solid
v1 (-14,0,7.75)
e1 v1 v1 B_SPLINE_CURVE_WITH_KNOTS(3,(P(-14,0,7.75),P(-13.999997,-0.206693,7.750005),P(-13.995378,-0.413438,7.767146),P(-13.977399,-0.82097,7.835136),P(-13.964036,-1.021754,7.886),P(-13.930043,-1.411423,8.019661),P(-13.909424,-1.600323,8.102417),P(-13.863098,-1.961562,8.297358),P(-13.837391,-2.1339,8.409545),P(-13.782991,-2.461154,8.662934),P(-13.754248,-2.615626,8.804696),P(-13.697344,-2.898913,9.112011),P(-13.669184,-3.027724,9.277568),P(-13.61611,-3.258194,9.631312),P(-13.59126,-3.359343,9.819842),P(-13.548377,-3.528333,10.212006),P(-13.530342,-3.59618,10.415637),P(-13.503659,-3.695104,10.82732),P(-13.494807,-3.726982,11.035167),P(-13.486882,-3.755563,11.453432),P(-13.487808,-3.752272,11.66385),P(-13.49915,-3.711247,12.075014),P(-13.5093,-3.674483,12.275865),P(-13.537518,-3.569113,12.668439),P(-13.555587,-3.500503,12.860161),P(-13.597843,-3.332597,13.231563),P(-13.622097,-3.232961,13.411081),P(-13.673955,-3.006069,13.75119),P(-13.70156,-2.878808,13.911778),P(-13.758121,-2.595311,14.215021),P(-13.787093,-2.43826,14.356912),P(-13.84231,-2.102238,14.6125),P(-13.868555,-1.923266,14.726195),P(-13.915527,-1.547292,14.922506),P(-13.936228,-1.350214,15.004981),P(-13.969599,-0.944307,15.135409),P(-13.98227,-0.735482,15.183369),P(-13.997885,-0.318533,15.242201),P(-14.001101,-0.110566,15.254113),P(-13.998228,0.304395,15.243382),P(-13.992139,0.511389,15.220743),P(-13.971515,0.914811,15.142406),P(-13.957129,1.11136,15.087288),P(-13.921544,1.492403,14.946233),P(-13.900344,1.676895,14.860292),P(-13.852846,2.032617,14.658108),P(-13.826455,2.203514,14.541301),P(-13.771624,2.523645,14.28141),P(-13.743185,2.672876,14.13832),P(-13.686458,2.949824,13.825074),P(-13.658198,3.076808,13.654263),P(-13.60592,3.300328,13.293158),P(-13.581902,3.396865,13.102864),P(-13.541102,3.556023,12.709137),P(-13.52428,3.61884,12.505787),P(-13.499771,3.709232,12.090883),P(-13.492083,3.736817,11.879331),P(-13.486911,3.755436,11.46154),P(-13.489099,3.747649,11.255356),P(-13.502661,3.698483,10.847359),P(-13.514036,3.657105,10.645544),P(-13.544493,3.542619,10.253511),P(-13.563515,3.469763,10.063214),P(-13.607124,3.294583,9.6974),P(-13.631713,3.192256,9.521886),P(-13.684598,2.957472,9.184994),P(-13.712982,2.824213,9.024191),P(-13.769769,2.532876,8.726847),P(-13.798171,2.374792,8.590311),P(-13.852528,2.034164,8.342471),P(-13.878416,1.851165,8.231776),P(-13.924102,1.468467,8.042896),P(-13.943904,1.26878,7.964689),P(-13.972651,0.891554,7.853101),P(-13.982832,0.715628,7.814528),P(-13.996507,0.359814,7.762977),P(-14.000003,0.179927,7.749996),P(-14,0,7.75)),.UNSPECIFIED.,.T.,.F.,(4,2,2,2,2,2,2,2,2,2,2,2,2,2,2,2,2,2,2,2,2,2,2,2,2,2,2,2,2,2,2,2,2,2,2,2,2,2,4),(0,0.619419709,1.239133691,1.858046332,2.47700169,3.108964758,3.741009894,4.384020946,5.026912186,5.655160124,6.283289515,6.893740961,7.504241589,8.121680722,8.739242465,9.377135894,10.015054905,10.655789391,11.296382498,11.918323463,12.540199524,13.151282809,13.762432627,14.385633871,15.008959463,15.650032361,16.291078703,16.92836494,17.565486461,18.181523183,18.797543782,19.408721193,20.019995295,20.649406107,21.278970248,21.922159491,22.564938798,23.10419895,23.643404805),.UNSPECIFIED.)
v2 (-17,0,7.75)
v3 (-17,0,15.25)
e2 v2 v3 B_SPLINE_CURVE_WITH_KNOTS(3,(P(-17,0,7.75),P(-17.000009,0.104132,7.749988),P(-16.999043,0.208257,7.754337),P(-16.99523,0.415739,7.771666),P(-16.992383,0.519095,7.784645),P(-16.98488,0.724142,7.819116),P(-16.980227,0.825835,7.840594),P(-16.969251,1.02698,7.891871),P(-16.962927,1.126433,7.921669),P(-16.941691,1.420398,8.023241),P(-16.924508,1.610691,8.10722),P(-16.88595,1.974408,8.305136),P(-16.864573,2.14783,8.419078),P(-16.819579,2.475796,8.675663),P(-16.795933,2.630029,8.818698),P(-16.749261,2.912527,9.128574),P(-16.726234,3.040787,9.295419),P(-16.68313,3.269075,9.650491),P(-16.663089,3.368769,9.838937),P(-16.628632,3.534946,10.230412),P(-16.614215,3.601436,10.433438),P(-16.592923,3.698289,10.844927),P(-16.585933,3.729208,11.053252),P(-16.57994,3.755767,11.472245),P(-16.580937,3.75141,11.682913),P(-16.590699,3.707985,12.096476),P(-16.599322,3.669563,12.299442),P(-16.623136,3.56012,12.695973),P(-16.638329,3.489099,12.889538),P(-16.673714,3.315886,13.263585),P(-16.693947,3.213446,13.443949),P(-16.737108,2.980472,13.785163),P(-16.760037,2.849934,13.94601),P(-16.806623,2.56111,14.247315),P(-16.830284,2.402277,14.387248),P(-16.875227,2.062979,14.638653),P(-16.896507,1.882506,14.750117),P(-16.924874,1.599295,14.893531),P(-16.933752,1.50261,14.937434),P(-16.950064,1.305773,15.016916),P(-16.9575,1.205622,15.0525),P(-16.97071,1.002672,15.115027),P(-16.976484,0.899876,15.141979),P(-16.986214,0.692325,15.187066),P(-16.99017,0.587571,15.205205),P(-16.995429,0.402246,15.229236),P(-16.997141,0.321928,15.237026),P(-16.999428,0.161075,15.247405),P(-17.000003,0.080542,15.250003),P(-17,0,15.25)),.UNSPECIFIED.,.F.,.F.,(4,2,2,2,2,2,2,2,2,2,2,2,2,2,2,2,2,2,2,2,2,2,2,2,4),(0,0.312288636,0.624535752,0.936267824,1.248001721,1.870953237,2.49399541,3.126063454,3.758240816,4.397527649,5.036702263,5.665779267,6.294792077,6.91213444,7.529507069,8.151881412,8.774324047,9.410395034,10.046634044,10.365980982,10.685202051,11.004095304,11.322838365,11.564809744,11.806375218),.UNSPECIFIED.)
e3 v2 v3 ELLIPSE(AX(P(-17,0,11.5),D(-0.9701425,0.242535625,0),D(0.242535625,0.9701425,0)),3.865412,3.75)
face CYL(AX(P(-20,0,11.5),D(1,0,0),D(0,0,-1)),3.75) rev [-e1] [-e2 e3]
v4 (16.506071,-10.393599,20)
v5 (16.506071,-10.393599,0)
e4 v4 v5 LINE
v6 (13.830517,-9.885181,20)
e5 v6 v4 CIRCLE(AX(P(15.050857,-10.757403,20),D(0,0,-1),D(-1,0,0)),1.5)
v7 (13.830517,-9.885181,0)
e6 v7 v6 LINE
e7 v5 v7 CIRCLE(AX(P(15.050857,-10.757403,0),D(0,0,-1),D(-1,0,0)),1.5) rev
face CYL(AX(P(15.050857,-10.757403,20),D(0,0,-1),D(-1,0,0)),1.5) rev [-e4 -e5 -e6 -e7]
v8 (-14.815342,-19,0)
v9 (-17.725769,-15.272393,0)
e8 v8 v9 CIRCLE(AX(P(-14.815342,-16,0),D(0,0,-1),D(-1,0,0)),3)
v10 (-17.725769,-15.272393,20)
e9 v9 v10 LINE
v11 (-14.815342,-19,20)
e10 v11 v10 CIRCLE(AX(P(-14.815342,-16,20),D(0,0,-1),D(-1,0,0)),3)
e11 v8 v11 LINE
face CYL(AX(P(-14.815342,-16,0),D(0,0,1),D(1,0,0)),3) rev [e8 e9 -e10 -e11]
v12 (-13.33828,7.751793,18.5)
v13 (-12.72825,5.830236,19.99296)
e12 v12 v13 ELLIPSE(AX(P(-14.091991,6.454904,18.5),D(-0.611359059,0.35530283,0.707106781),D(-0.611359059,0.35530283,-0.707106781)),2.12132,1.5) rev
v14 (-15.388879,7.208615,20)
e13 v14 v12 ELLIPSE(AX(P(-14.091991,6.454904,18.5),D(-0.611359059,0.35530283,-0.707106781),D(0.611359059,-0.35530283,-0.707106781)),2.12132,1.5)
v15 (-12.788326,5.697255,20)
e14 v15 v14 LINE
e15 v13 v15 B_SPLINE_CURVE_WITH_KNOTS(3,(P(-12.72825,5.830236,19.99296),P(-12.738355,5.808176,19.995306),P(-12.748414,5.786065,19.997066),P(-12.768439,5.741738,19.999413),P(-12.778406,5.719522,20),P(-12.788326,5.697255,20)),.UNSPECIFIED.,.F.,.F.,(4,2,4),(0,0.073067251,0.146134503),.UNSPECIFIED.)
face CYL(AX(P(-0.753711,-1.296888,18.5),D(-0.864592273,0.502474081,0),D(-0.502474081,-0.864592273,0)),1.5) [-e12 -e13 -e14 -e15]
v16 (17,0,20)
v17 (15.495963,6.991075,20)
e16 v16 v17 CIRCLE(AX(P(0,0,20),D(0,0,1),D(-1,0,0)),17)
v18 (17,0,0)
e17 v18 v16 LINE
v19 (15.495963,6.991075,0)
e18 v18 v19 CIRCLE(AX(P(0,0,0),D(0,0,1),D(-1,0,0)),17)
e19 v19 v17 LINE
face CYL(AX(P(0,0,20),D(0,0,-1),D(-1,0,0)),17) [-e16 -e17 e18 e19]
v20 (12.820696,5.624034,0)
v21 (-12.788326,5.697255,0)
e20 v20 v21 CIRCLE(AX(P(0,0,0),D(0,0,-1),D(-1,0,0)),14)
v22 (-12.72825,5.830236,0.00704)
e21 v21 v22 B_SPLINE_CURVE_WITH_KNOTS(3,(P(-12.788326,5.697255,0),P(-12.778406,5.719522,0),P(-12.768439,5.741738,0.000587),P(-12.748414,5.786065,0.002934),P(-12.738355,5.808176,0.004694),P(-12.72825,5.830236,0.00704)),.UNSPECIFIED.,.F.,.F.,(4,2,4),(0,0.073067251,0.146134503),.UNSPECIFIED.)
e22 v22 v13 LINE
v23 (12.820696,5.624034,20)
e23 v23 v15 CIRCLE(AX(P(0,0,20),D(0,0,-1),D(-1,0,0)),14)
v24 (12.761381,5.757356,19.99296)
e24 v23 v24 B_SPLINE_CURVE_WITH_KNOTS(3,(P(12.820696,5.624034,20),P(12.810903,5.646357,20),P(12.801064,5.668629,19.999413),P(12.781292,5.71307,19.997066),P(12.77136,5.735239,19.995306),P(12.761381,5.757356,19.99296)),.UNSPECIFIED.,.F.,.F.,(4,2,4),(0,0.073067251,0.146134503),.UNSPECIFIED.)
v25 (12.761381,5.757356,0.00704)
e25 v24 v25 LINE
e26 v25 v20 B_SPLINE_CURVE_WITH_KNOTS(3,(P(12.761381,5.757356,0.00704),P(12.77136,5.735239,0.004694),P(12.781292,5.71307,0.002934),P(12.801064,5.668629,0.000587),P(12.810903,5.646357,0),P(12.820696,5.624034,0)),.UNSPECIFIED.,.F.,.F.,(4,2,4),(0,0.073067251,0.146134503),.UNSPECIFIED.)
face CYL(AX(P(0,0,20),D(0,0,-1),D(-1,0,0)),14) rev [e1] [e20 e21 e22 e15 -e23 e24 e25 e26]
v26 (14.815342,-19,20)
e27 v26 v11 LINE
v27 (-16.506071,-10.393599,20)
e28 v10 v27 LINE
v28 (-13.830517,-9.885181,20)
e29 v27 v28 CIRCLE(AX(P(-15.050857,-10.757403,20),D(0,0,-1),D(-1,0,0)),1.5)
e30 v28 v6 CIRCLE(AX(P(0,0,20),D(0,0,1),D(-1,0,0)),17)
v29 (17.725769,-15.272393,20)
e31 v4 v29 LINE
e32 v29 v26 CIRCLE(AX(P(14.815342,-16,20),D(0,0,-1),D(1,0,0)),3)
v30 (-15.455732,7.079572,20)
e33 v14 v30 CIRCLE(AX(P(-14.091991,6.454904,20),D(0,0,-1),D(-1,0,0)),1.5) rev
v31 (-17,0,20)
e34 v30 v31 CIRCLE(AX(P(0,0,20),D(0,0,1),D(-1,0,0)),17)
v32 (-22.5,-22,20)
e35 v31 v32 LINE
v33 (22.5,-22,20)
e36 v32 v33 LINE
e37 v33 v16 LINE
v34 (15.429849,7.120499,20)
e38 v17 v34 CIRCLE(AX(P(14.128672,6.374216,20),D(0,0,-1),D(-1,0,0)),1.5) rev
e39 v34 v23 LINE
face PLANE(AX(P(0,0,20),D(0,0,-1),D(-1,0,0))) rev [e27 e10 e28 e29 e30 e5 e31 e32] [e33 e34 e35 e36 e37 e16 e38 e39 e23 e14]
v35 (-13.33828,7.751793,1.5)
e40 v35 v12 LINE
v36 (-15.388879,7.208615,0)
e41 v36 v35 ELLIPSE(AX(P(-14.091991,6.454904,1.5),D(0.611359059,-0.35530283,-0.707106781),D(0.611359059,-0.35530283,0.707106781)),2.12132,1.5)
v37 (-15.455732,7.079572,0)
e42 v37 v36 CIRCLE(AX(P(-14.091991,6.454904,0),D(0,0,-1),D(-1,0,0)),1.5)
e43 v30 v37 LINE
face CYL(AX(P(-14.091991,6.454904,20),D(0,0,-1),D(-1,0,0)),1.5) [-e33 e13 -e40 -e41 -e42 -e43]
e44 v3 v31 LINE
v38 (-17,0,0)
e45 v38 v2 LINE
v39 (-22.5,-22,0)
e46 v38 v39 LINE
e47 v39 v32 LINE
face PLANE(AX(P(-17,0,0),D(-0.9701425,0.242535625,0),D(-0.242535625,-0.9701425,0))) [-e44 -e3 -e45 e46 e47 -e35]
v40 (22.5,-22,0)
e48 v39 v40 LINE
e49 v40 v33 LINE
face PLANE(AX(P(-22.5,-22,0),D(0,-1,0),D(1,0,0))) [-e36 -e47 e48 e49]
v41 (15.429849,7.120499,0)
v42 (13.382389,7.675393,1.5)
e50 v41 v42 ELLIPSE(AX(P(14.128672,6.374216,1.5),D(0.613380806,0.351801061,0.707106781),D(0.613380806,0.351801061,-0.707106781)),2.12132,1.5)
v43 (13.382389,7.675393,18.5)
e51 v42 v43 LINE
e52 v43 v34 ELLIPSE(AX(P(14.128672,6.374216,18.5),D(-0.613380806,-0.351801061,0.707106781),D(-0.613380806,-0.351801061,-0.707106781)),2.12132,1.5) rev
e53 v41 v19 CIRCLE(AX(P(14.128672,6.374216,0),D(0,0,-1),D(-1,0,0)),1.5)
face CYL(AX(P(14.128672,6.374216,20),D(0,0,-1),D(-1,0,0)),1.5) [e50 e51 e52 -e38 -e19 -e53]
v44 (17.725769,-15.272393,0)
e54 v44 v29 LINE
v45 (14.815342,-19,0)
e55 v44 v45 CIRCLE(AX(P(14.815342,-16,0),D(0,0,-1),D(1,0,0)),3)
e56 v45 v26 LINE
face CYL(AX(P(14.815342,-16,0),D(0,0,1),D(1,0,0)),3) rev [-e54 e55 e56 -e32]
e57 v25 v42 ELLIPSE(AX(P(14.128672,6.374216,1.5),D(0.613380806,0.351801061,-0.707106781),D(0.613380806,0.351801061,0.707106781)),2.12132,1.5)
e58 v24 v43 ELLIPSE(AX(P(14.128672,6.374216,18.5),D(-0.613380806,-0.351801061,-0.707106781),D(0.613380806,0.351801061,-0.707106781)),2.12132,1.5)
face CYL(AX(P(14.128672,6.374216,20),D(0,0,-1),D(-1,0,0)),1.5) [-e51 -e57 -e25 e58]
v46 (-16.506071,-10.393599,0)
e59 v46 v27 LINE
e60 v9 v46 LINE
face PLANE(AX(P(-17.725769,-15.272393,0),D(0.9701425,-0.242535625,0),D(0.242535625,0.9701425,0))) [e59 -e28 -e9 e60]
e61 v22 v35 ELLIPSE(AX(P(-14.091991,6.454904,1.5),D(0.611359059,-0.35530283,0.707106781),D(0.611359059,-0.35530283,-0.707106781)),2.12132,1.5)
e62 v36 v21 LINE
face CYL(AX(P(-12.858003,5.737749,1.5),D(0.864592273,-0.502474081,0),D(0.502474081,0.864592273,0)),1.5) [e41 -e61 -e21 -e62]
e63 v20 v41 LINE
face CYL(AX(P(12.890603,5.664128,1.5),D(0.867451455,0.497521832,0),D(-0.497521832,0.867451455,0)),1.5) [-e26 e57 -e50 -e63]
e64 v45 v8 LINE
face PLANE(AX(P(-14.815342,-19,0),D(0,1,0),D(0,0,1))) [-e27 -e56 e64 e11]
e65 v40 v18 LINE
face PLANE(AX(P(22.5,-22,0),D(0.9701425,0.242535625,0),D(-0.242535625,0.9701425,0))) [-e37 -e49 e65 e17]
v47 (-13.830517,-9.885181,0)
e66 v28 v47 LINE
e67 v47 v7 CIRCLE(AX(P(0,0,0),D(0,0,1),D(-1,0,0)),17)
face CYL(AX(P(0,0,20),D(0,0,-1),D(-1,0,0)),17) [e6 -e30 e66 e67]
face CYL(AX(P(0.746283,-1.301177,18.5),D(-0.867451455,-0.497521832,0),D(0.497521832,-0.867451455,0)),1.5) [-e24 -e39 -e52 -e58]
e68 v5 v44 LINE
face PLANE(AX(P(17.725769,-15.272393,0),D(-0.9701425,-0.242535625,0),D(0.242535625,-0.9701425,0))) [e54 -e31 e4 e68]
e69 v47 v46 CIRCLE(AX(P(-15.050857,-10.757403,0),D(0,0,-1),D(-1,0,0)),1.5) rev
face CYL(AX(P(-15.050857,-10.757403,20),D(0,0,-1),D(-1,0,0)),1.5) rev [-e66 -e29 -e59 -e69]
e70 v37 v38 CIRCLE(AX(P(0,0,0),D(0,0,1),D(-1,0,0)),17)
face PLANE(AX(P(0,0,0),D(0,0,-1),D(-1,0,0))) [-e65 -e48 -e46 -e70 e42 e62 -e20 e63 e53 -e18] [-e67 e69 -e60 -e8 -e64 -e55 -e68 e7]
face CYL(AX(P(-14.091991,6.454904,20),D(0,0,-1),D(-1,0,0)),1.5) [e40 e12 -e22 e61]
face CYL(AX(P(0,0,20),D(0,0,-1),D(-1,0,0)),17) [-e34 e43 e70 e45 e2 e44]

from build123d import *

# Parameters (mm, degrees)
BOSS_EXTRUDE1_DEPTH = 20
BOSS_EXTRUDE2_START = -20
BOSS_EXTRUDE2_DEPTH = 20
FILLET1_R           = 1.5
FILLET2_R           = 1.5
SKETCH3_R           = 3.75
CUT_EXTRUDE1_DEPTH  = 20


with BuildPart() as part:
    # Sketch1 → Boss-Extrude1 (new body)
    with BuildSketch(Plane.XY):
        with BuildLine():
            Line((12.14432037, 6.965305646), (14.746674735, 8.457871142))
            ThreePointArc((14.746674735, 8.457871142), (-0.048606097, -16.999930513), (-14.698068638, 8.542059371))
            Line((-14.698068638, 8.542059371), (-12.10429182, 7.034637129))
            ThreePointArc((-12.10429182, 7.034637129), (-0.04002855, -13.999942775), (12.14432037, 6.965305646))
        make_face()
    extrude(amount=BOSS_EXTRUDE1_DEPTH)

    # Sketch2 → Boss-Extrude2 (add)
    with BuildSketch(Plane.XY.offset(20).offset(BOSS_EXTRUDE2_START)):
        with BuildLine():
            Line((-17, 0), (-22.5, -22))
            Line((-22.5, -22), (22.5, -22))
            Line((22.5, -22), (17, 0))
            ThreePointArc((17, 0), (16.645771335, -3.452288612), (15.597847452, -6.760706684))
            Line((15.597847452, -6.760706684), (17.725769062, -15.272393125))
            ThreePointArc((17.725769062, -15.272393125), (17.179957876, -17.846236628), (14.815341562, -19))
            Line((14.815341562, -19), (-14.815341562, -19))
            ThreePointArc((-14.815341562, -19), (-17.179957876, -17.846236628), (-17.725769062, -15.272393125))
            Line((-17.725769062, -15.272393125), (-15.597847452, -6.760706684))
            ThreePointArc((-15.597847452, -6.760706684), (-16.645771335, -3.452288612), (-17, 0))
        make_face()
    extrude(amount=BOSS_EXTRUDE2_DEPTH)

    # Fillet1
    fillet1_edges = [part.edges().sort_by_distance(p)[0] for p in [
        (-15.597847452, -6.760706684, 10),
        (15.597847452, -6.760706684, 10),
    ]]
    fillet(fillet1_edges, radius=FILLET1_R)

    # Fillet2
    fillet2_edges = [part.edges().sort_by_distance(p)[0] for p in [
        (13.445497553, 7.711588394, 20),
        (13.445497553, 7.711588394, 0),
        (-13.401180229, 7.78834825, 0),
        (12.14432037, 6.965305646, 10),
        (14.746674735, 8.457871142, 10),
        (-14.698068638, 8.542059371, 10),
        (-12.10429182, 7.034637129, 10),
        (-13.401180229, 7.78834825, 20),
    ]]
    fillet(fillet2_edges, radius=FILLET2_R - 0.0001)  # a hair under: the kernel refuses the full size

    # Sketch3 → Cut-Extrude1 (cut)
    with BuildSketch(Plane(origin=(0, 0, 0), x_dir=(0, 0, -1), z_dir=(1, 0, 0))):
        with Locations((-11.5, 0)):
            Circle(SKETCH3_R)
    extrude(amount=-CUT_EXTRUDE1_DEPTH, mode=Mode.SUBTRACT)


solid = part.part
